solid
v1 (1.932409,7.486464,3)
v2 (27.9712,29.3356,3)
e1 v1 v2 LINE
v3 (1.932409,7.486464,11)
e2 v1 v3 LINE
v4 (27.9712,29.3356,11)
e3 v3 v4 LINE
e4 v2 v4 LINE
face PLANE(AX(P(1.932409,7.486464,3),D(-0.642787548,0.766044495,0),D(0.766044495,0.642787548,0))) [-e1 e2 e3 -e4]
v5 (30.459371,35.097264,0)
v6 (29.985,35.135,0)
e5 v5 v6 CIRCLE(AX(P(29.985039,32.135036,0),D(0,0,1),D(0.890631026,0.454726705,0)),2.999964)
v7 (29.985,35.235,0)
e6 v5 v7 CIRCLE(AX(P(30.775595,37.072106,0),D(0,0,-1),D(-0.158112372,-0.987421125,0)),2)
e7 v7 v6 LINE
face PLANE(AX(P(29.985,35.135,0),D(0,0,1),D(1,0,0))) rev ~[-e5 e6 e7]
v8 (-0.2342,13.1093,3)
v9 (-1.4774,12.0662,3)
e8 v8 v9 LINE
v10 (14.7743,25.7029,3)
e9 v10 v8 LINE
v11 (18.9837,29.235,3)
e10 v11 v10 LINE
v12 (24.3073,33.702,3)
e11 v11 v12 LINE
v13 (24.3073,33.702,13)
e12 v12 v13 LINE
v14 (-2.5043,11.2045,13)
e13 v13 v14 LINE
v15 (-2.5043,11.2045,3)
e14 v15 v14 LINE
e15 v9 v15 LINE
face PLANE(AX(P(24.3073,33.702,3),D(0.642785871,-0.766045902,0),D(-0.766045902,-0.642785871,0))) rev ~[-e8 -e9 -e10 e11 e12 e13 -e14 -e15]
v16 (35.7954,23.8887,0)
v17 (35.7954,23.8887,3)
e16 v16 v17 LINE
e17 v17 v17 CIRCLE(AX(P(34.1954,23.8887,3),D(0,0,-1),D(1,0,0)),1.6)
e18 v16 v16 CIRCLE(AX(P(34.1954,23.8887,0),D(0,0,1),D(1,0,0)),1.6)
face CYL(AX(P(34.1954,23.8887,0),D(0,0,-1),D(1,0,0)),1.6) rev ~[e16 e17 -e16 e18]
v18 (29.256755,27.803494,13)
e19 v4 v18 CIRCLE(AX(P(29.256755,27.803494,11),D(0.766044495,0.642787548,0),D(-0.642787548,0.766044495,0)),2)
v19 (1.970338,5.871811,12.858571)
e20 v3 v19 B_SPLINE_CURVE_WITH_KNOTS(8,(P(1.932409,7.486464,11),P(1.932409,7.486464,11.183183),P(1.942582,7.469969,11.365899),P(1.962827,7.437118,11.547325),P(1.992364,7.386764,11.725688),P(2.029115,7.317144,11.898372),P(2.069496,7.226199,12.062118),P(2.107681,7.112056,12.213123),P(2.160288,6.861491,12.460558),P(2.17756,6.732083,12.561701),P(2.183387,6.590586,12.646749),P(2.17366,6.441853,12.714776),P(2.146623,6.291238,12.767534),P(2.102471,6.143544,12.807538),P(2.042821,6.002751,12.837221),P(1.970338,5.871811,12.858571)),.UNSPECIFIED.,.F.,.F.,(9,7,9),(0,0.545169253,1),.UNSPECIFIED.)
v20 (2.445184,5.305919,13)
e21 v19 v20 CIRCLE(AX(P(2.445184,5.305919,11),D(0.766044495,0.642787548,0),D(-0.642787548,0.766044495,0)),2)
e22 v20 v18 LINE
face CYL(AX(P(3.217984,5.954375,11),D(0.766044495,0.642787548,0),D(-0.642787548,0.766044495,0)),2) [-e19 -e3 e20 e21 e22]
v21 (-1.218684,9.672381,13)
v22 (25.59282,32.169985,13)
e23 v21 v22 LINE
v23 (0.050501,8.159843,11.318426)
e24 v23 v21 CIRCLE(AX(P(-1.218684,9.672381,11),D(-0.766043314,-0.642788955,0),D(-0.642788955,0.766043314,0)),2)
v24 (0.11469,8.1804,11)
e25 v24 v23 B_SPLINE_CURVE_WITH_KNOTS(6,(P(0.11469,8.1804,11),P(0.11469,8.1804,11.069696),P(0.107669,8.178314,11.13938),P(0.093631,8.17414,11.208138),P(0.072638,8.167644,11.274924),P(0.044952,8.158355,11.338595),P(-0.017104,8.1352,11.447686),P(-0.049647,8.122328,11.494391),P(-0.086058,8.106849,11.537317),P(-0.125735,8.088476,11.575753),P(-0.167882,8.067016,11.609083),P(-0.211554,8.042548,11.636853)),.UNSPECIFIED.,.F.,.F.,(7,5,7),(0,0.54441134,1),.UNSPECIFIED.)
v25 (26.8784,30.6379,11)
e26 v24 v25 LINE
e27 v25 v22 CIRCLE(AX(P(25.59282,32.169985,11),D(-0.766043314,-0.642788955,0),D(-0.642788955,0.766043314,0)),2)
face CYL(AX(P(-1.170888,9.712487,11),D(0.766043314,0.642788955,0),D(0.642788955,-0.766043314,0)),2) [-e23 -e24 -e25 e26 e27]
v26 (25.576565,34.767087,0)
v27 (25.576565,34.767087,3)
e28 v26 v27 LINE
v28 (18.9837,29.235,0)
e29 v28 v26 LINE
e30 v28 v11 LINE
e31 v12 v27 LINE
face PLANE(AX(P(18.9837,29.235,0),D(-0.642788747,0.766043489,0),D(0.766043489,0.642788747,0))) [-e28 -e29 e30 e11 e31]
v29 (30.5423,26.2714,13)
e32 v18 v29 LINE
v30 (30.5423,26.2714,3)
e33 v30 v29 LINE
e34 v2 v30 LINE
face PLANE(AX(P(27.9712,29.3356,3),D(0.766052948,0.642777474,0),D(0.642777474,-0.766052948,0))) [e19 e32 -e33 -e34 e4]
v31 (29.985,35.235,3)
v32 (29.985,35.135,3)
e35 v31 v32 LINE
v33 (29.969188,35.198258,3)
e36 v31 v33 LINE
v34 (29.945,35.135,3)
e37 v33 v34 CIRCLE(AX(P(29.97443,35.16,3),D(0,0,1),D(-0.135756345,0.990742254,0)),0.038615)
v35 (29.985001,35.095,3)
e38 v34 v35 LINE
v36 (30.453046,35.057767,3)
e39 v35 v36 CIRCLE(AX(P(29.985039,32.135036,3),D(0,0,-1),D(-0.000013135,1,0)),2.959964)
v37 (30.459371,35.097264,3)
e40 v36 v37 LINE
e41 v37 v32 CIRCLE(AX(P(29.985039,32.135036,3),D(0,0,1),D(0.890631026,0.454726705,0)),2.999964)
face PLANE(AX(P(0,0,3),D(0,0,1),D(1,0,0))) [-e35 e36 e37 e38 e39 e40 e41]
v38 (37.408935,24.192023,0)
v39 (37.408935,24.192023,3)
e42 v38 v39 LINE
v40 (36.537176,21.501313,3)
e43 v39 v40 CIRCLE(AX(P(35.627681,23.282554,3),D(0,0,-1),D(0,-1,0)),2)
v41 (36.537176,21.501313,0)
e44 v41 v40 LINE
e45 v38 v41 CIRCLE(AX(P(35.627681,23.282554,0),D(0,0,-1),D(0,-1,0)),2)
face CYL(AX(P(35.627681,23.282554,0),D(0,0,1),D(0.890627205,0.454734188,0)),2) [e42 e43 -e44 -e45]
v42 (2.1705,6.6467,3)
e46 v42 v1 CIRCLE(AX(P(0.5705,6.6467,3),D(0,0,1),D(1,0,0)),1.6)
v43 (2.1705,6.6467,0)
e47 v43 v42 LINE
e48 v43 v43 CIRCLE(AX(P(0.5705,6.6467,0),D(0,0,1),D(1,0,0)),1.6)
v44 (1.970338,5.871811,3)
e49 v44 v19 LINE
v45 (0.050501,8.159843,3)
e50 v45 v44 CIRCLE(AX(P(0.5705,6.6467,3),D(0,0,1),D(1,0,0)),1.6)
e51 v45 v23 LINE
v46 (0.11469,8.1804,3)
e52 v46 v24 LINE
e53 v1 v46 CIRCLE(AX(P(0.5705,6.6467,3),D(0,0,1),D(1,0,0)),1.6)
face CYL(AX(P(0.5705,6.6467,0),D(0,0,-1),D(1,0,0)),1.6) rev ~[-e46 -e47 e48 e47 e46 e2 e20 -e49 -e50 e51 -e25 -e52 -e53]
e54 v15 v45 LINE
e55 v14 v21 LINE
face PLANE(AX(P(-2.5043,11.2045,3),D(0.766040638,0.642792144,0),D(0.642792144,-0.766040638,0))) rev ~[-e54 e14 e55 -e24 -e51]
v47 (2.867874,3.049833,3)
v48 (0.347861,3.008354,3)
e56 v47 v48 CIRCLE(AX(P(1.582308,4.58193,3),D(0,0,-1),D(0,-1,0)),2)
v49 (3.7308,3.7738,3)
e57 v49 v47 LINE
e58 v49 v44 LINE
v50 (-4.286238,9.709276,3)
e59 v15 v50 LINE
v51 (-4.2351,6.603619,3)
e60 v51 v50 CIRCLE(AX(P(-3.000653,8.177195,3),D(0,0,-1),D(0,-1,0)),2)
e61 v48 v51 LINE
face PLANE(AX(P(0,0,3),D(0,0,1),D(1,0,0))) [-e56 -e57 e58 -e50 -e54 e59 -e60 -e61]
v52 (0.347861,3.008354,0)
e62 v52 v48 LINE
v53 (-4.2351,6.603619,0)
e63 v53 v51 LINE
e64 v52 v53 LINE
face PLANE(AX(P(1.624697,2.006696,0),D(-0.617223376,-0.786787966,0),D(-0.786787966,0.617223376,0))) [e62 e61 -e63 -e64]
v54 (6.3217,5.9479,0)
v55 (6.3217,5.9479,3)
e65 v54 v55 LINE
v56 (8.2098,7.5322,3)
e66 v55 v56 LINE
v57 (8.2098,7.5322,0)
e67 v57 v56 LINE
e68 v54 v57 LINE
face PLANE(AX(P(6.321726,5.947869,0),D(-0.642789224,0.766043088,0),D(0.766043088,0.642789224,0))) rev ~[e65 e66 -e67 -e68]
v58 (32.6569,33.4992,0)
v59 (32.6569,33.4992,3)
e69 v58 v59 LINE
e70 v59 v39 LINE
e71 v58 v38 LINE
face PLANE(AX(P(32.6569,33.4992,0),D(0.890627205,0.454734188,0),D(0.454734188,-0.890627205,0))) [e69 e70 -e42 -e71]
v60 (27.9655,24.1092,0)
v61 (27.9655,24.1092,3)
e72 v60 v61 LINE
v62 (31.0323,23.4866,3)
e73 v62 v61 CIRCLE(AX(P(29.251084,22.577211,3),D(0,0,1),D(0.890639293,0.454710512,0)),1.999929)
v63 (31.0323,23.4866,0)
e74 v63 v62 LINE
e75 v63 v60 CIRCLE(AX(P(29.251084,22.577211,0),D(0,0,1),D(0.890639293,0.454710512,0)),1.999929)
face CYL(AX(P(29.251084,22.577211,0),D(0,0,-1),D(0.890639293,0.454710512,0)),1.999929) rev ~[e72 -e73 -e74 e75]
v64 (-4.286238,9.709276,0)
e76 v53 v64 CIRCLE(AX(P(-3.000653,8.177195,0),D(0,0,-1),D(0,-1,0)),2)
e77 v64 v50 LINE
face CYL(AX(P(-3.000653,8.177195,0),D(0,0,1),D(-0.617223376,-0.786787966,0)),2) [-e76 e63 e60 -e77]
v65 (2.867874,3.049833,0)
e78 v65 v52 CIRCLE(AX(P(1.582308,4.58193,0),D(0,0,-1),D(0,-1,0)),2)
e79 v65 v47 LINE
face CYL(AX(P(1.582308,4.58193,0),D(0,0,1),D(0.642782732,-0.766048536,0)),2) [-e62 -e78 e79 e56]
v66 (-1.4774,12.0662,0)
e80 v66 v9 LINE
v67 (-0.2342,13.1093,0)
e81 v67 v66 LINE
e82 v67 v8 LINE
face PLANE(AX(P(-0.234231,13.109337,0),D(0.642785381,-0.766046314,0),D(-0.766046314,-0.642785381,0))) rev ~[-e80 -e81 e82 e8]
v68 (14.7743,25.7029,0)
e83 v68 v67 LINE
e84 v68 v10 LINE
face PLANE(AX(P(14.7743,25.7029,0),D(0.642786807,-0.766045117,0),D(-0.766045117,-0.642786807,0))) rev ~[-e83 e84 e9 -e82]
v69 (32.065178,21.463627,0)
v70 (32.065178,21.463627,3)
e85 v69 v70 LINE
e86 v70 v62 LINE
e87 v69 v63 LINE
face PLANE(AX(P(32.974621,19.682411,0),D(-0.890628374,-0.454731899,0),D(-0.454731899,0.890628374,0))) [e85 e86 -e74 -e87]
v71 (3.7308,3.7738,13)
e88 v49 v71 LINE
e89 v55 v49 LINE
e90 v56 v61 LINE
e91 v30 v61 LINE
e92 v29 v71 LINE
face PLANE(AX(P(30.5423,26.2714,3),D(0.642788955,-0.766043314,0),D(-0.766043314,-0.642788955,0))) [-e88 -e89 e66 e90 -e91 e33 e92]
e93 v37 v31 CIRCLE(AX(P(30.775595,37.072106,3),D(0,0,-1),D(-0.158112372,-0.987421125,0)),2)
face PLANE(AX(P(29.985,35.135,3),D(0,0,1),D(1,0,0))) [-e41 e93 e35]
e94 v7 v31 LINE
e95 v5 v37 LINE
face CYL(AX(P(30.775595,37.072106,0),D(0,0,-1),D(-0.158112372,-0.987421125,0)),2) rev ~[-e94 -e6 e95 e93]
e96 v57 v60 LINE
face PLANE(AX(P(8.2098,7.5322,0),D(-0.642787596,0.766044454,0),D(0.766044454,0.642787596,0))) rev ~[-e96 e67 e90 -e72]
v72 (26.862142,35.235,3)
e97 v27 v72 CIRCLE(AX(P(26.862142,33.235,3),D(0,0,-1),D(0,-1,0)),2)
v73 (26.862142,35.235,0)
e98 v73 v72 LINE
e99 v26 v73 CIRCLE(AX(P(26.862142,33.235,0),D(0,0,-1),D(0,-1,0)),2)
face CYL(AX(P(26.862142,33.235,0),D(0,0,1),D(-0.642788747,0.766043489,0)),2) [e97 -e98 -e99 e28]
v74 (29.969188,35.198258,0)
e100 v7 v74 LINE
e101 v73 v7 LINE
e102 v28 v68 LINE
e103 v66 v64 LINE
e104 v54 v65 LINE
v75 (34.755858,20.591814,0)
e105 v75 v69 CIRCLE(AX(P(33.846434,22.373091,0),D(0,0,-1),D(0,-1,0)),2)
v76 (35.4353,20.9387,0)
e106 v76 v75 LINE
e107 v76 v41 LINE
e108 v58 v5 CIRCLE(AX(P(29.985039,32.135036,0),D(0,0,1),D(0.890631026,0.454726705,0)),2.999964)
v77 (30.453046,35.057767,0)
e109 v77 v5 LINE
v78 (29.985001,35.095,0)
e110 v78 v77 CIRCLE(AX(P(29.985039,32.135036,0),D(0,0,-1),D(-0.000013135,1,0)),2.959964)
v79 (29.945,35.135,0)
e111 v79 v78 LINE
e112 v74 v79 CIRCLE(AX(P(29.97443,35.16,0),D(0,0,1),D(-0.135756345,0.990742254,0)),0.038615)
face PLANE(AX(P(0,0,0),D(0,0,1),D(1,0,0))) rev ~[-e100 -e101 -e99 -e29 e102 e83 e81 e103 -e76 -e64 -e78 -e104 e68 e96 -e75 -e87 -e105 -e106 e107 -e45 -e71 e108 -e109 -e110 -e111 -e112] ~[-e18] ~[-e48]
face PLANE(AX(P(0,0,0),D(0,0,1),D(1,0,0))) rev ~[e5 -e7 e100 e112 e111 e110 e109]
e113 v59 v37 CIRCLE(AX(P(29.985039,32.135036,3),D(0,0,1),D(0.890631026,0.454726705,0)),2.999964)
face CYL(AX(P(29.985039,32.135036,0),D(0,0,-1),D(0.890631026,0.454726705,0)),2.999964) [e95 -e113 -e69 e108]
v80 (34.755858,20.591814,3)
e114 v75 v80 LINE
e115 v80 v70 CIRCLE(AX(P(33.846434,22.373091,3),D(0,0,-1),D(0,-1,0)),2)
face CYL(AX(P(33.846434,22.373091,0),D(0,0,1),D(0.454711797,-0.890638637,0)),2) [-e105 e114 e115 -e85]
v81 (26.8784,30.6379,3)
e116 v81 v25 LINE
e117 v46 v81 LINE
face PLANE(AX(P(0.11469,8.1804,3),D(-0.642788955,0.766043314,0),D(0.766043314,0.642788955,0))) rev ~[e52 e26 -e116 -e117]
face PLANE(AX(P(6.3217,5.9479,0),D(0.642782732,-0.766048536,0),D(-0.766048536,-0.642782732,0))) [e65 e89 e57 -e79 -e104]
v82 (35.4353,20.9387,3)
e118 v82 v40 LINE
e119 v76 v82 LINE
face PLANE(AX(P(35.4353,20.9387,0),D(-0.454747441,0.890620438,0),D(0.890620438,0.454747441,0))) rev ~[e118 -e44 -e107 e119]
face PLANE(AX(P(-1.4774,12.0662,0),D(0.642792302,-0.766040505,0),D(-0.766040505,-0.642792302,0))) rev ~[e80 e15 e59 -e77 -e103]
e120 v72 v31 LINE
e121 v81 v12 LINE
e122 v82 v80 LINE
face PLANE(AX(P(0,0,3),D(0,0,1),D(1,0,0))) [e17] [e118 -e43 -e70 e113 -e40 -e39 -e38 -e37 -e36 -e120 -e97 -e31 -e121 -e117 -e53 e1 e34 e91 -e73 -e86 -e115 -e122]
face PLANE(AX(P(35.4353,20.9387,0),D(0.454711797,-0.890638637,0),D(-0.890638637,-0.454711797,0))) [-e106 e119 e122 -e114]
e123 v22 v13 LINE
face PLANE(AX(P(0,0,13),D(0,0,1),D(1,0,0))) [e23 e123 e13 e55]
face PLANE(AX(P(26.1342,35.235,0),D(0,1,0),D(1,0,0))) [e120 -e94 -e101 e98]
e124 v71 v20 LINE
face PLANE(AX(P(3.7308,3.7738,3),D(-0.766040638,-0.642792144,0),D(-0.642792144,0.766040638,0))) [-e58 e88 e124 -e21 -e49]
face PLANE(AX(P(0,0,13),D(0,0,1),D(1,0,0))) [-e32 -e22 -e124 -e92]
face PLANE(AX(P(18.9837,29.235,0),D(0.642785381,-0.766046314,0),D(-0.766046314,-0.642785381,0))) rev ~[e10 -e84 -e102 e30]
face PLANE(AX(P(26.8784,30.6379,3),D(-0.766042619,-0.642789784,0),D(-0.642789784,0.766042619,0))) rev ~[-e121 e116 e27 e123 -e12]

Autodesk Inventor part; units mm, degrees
ref_plane "YZ Plane" through (0, 0, 0) normal (1, 0, 0) x (0, 1, 0)
ref_plane "XZ Plane" through (0, 0, 0) normal (0, 1, 0) x (-1, 0, 0)
ref_plane "XY Plane" through (0, 0, 0) normal (0, 0, 1) x (1, 0, 0)
sketch "Sketch1" plane through (0, 0, 0) normal (0, 0, 1) x (1, 0, 0)
  circle A0 centre (0.5705, 6.6467) radius 1.6 projected
  circle A1 centre (34.1954, 23.8887) radius 1.6 projected
  circle A2 centre (-47.845, -32.335) radius 1.55 projected
  circle A3 centre (-32.175, 32.335) radius 1.55 projected
  circle A4 centre (16.035, -5.485) radius 1.55 projected
  circle A5 centre (29.985, 32.135) radius 1.55 projected
  circle A6 centre (47.845, -2.845) radius 1.55 projected
  line L0 (41.7829, 2.4307) -> (31.0323, 23.4866) projected
  line L1 (17.7425, -2.333) -> (40.1671, -0.4719) projected
  line L2 (1.7387, 9.5432) -> (3.1056, 8.4709) projected
  line L3 (8.2098, 7.5322) -> (27.9655, 24.1092) projected
  line L4 (27.8513, 29.235) -> (3.1056, 8.4709) projected
  line L5 (1.7387, 9.5432) -> (25.2065, 29.235) projected
  line L6 (27.8513, 29.235) -> (25.2065, 29.235) projected
  line L7 (14.7743, 25.7029) -> (-0.2342, 13.1093) projected
  line L8 (-18.8076, 25.6614) -> (-2.7542, 13.0678) projected
  line L9 (13.4887, 29.235) -> (-17.5731, 29.235) projected
  line L10 (7.493, -2.5969) -> (-27.9115, 25.1774) projected
  line L11 (-39.8787, -25.7324) -> (7.0335, -6.0143) projected
  line L12 (-31.0897, 24.0748) -> (-42.5975, -23.4177) projected
  line L13 (16.4652, -8.5584) -> (-46.6826, -35.1006) projected
  line L14 (48.0931, -5.8347) -> (17.0747, -8.409) projected
  arc A7 (48.0931, -5.8347) -> (50.5169, -1.4808) centre (47.845, -2.845) ccw projected
  line L15 (32.6569, 33.4992) -> (50.5169, -1.4808) projected
  arc A8 (32.6569, 33.4992) -> (29.985, 35.135) centre (29.985, 32.135) ccw projected
  line L16 (29.985, 35.235) -> (29.985, 35.135) projected
  line L17 (-31.4069, 35.235) -> (29.985, 35.235) projected
  arc A9 (-31.4069, 35.235) -> (-35.0906, 33.0415) centre (-32.175, 32.335) ccw projected
  line L18 (-50.7606, -31.6285) -> (-35.0906, 33.0415) projected
  arc A10 (-50.7606, -31.6285) -> (-46.6826, -35.1006) centre (-47.845, -32.335) ccw projected
  line L19 (29.8899, 25.724) -> (34.6062, 29.6814)
  line L20 (18.9837, 29.235) -> (26.1342, 35.235)
  line L21 (-1.4774, 12.0662) -> (-6.1744, 8.1249)
  line L22 (6.3217, 5.9479) -> (1.6247, 2.0067)
  line L23 (34.1954, 23.8887) -> (35.4353, 20.9387)
  line L24 (35.4353, 20.9387) -> (32.9746, 19.6824)
  line L25 (35.4353, 20.9387) -> (38.3184, 22.4108)
  arc A11 (16.3427, -1.9134) -> (17.7425, -2.333) centre (17.5771, -0.3398) ccw projected
  line L26 (8.261, 4.4266) -> (16.3427, -1.9134) projected
  arc A12 (8.2098, 7.5322) -> (8.261, 4.4266) centre (9.4954, 6.0002) ccw projected
  arc A13 (31.0323, 23.4866) -> (27.9655, 24.1092) centre (29.251, 22.5771) ccw projected
  arc A14 (40.1671, -0.4719) -> (41.7829, 2.4307) centre (40.0017, 1.5213) ccw projected
  arc A15 (-2.7542, 13.0678) -> (-0.2342, 13.1093) centre (-1.5198, 14.6414) ccw projected
  arc A16 (-17.5731, 29.235) -> (-18.8076, 25.6614) centre (-17.5731, 27.235) ccw projected
  arc A17 (14.7743, 25.7029) -> (13.4887, 29.235) centre (13.4887, 27.235) ccw projected
  arc A18 (7.0335, -6.0143) -> (7.493, -2.5969) centre (6.2586, -4.1705) ccw projected
  arc A19 (-42.5975, -23.4177) -> (-39.8787, -25.7324) centre (-40.6537, -23.8886) ccw projected
  arc A20 (-27.9115, 25.1774) -> (-31.0897, 24.0748) centre (-29.1459, 23.6038) ccw projected
  arc A21 (17.0747, -8.409) -> (16.4652, -8.5584) centre (17.2401, -10.4022) ccw projected
  line L27 (18.9837, 29.235) -> (-1.4774, 12.0662)
  line L28 (6.2586, 5.8949) -> (29.8899, 25.724)
  point P0 (0, 0)
  dimension "d11" = 3.2
extrude "Extrusion1" add sketch "Sketch1" along normal blind 3 contours A5 | L0 A13 L28 L19 L15 L25 L24 | L3 L28 L22 L10 L21 L27 L7 L20 L17 L16 A8 L15 L19 | L5 L6 L4 L2
fillet "Fillet1" radius 2 3 edges at (26.1342, 35.235, 1.5) (1.6247, 2.0067, 1.5) (-6.1744, 8.1249, 1.5)
sketch "Sketch2" plane through (0, 0, 3) normal (0, 0, 1) x (1, 0, 0)
  line L0 (1.7387, 9.5432) -> (25.2065, 29.235) construction
  line L1 (13.4726, 19.3891) -> (14.5654, 18.0868) construction
  line L2 (27.8513, 29.235) -> (3.1056, 8.4709) construction
  line L3 (1.1596, 6.838) -> (27.9712, 29.3356) construction
  line L4 (27.9712, 29.3356) -> (26.8784, 30.6379) construction
  line L5 (26.8784, 30.6379) -> (0.0669, 8.1403) construction
  line L6 (0.0669, 8.1403) -> (1.1596, 6.838) construction
  line L7 (1.1596, 6.838) -> (26.8784, 30.6379) construction
  line L8 (27.9712, 29.3356) -> (0.0669, 8.1403) construction
  line L9 (1.1596, 6.838) -> (36.1596, 6.838) construction
  line L10 (1.1596, 6.838) -> (27.9712, 29.3356)
  line L11 (27.9712, 29.3356) -> (30.5423, 26.2714)
  line L12 (30.5423, 26.2714) -> (3.7308, 3.7738)
  line L13 (3.7308, 3.7738) -> (1.1596, 6.838)
  line L14 (0.0669, 8.1403) -> (26.8784, 30.6379)
  line L15 (26.8784, 30.6379) -> (24.3073, 33.702)
  line L16 (24.3073, 33.702) -> (-2.5043, 11.2045)
  line L17 (-2.5043, 11.2045) -> (0.0669, 8.1403)
  circle A0 centre (0.5705, 6.6467) radius 1.6 projected
  point P0 (0, 0)
  point P1 (14.019, 18.7379)
  point P2 (0.0505, 8.1598)
  point P3 (0.1146, 8.1803)
  point P4 (1.9324, 7.4865)
  point P5 (1.9704, 5.8718)
  dimension "d3" = 35
  dimension "d4" = 40
  dimension "d5" = 1.7
  dimension "d6" = 4
  dimension "d7" = 4
extrude "Extrusion2" add sketch "Sketch2" along normal blind 10 contours L10 L11 L12 L13 A0 | A0 L17 L16 L15 L14
fillet "Fillet2" radius 2 2 edges at (14.9518, 18.411, 13) (13.4965, 19.4091, 13)
fillet "Fillet3" radius 2 2 edges at (38.3184, 22.4108, 1.5) (32.9746, 19.6824, 1.5)
fillet "Fillet4" radius 2 1 edges at (29.985, 35.135, 1.5)
properties part number "skr-mini-mount-clip"
